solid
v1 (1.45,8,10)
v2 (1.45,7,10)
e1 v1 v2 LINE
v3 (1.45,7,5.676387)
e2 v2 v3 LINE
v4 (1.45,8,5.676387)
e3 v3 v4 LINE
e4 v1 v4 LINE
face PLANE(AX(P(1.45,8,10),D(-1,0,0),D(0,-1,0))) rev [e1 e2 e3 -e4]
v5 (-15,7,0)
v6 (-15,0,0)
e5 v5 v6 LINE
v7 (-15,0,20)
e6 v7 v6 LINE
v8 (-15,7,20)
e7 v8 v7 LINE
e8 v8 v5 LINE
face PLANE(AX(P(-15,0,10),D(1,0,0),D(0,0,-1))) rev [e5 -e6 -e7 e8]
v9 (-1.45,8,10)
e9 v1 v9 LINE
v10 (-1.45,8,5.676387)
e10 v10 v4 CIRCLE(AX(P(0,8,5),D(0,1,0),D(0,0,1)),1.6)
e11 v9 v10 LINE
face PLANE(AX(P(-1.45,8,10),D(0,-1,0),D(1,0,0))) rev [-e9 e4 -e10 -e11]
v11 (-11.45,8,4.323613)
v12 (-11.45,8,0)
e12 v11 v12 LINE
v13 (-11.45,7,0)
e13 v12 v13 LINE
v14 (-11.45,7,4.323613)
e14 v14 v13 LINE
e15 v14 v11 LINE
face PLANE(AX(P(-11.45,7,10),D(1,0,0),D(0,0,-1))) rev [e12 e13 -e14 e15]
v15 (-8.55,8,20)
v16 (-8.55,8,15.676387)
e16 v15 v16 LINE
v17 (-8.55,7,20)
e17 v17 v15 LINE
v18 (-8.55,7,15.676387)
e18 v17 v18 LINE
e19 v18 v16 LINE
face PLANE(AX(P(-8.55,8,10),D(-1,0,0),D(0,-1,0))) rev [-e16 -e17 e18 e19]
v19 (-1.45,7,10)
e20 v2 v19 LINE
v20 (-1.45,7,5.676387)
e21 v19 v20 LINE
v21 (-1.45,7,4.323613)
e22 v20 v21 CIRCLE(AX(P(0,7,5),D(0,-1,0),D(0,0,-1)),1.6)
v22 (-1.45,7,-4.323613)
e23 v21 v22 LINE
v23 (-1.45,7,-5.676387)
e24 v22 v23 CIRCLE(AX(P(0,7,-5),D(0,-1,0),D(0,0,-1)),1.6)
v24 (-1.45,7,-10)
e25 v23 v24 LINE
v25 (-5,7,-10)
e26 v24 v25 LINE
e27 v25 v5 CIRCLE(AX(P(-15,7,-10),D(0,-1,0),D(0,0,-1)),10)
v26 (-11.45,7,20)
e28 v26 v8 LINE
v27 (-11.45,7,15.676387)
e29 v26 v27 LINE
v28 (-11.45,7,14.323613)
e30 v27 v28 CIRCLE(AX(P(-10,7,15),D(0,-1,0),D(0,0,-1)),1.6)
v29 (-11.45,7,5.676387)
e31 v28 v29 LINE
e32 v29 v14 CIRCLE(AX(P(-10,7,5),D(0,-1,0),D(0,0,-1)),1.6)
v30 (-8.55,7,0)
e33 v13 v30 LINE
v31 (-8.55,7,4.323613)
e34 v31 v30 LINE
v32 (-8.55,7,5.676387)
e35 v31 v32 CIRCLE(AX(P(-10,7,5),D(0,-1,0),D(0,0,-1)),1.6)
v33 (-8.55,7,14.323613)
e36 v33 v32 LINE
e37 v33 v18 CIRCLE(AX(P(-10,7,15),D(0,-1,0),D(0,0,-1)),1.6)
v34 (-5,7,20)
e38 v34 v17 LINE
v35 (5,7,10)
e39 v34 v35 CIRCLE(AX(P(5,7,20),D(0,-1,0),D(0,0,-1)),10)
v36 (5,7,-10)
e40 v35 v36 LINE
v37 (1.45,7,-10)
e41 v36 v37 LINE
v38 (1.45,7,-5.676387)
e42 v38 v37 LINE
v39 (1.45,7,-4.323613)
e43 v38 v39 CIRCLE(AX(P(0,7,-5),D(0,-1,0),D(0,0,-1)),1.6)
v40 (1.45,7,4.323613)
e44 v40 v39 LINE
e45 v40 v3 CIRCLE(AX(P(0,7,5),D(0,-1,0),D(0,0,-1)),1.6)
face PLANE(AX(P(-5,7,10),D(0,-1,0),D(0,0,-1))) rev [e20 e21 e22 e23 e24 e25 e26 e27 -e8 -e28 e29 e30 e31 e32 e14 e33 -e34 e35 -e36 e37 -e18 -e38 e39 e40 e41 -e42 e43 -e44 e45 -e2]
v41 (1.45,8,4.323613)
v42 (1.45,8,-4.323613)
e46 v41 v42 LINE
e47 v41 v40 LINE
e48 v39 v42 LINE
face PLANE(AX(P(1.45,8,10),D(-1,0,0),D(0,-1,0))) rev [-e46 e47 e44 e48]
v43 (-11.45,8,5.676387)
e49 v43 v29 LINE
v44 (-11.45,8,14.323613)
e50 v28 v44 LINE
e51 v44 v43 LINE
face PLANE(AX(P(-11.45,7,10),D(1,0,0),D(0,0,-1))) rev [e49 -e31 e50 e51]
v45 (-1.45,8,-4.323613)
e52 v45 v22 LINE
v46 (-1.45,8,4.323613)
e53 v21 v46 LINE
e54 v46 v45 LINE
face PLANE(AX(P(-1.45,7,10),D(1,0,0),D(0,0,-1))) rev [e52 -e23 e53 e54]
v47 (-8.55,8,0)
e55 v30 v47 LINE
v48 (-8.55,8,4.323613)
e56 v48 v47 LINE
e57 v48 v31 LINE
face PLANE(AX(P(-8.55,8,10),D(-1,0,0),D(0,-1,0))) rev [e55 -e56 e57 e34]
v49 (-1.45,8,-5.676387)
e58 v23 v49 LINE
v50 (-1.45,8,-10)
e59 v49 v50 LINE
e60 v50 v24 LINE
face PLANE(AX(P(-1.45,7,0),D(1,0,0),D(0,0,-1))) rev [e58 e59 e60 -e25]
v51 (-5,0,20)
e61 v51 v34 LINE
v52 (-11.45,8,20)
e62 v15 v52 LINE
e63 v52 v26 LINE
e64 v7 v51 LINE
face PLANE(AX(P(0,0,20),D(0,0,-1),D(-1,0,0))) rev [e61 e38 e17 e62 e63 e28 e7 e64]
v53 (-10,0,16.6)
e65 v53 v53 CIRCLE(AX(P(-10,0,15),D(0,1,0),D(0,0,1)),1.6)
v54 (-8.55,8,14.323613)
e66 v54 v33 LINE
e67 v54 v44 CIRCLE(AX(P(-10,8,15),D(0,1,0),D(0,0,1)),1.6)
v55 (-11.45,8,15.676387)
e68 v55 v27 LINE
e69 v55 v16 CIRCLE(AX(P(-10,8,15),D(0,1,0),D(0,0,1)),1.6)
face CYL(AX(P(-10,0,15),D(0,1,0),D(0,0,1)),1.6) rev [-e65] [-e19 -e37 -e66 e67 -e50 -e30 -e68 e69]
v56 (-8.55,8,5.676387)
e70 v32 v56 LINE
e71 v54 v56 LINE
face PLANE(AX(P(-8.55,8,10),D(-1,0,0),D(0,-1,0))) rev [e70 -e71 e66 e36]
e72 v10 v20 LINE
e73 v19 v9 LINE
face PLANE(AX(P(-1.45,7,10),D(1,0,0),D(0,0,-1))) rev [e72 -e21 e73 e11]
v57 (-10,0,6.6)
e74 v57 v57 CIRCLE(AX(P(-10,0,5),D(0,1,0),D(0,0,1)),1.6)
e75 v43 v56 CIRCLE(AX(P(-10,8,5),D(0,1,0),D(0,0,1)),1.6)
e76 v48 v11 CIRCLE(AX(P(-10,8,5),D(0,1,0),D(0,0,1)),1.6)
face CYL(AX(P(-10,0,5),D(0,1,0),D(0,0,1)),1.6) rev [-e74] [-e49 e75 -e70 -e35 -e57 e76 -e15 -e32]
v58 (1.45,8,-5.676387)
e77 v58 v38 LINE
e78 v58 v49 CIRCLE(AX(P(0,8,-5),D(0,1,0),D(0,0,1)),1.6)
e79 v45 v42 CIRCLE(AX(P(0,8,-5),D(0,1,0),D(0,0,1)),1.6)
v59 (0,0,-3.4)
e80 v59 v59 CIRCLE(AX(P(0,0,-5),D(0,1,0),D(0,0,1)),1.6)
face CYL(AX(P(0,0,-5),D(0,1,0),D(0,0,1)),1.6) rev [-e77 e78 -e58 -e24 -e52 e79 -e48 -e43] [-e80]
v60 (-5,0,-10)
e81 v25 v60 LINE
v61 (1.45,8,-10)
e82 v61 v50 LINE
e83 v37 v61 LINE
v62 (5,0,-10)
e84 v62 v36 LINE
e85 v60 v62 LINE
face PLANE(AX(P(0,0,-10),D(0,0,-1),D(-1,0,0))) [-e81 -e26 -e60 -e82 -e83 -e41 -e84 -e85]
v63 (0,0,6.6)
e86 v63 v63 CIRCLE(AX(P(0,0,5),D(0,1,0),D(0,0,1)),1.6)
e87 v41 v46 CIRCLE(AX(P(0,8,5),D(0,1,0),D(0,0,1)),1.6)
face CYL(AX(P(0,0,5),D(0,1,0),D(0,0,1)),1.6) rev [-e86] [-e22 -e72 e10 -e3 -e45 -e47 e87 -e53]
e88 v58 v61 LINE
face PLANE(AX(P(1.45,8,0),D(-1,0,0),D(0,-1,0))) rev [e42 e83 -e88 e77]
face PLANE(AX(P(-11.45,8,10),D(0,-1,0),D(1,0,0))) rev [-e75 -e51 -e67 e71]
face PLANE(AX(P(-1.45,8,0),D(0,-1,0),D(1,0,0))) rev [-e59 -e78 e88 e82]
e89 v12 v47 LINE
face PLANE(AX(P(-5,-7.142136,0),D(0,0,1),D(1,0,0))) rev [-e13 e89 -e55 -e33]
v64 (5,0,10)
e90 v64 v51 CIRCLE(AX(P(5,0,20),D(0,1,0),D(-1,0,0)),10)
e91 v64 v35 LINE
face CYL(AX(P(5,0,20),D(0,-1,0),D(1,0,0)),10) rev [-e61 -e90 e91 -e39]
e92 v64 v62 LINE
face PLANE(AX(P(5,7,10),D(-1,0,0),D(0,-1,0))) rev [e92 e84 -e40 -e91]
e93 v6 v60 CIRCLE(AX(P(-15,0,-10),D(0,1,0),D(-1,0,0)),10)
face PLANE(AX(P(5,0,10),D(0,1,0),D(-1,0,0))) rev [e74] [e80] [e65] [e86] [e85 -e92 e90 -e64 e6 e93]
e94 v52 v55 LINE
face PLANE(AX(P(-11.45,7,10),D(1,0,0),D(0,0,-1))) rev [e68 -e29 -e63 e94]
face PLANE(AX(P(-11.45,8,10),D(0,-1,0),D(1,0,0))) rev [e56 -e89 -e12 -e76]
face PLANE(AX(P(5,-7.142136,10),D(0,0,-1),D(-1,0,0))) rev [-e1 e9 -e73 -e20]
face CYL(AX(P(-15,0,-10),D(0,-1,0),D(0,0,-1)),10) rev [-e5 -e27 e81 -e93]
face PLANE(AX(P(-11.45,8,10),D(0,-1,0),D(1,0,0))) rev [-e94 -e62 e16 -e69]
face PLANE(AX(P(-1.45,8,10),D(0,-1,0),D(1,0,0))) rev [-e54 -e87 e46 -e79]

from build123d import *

# Parameters (mm, degrees)
MAIN_DEPTH                = 10
ESQUISSE2_R               = 1.6
TOPHOLE_DEPTH             = 14.747727085
LPATTERN1_COUNT           = 2
LPATTERN1_PITCH           = 10
LPATTERN2_COUNT           = 2
LPATTERN2_PITCH           = 10
LPATTERN2_2_COUNT         = 2
LPATTERN2_2_PITCH         = 10
LPATTERN3_COUNT           = 2
LPATTERN3_PITCH           = 10
LPATTERN3_COPY_1_DEPTH    = 10
LPATTERN3_COPY_2_SKETCH_R = 1.6
LPATTERN3_COPY_2_DEPTH    = 14.747727085
LPATTERN3_COPY_3_DEPTH    = 10
SKETCH1_W                 = 10
SKETCH1_H                 = 10
CUT_EXTRUDE1_DEPTH        = 27.248809497
FILLET1_R                 = 10
SKETCH2_W                 = 10
SKETCH2_H                 = 10
CUT_EXTRUDE2_DEPTH        = 1


with BuildPart() as part:
    # Esquisse1 → Main (new body)
    with BuildSketch(Plane.XY):
        Polygon((-5, 0), (-5, 7), (-1.45, 7), (-1.45, 8), (1.45, 8), (1.45, 7), (5, 7), (5, 0), align=None)
    main = extrude(amount=MAIN_DEPTH)

    # Esquisse2 → TopHole (cut, through all)
    with BuildSketch(Plane(origin=(0, 8, 0), x_dir=(1, 0, 0), z_dir=(0, 1, 0))):
        with Locations(Location((0, -5, 0), (0, 0, 270))):
            Circle(ESQUISSE2_R)
    tophole = extrude(amount=-TOPHOLE_DEPTH, mode=Mode.SUBTRACT)


with BuildPart() as lpattern1_1:
    # LPattern1: pattern copy
    add(part.part.moved(Location(Vector(0, 0, -1) * (1 * LPATTERN1_PITCH))))


with BuildPart() as part_1:
    add(part.part)

    add(lpattern1_1.part)  # LPattern2 merges LPattern1_1
    # LPattern2: Main ×2
    with Locations(*[(-i * LPATTERN2_PITCH, 0, 0) for i in range(1, LPATTERN2_COUNT)]):
        add(main)

    # LPattern2 2: TopHole ×2
    with Locations(*[(-i * LPATTERN2_2_PITCH, 0, 0) for i in range(1, LPATTERN2_2_COUNT)]):
        add(tophole, mode=Mode.SUBTRACT)

    # LPattern3: TopHole ×2
    with Locations(*[(0, 0, i * LPATTERN3_PITCH) for i in range(1, LPATTERN3_COUNT)]):
        add(tophole, mode=Mode.SUBTRACT)

    # LPattern3 copy 1 sketch → LPattern3 copy 1 (add)
    with BuildSketch(Plane(origin=(-10, 0, 10), x_dir=(1, 0, 0), z_dir=(0, 0, 1))):
        Polygon((-5, 0), (-5, 7), (-1.45, 7), (-1.45, 8), (1.45, 8), (1.45, 7), (5, 7), (5, 0), align=None)
    extrude(amount=LPATTERN3_COPY_1_DEPTH)

    # LPattern3 copy 2 sketch → LPattern3 copy 2 (cut, through all)
    with BuildSketch(Plane(origin=(-10, 8, 10), x_dir=(1, 0, 0), z_dir=(0, 1, 0))):
        with Locations(Location((0, -5, 0), (0, 0, 270))):
            Circle(LPATTERN3_COPY_2_SKETCH_R)
    extrude(amount=-LPATTERN3_COPY_2_DEPTH, mode=Mode.SUBTRACT)

    # LPattern3 copy 3 sketch → LPattern3 copy 3 (add)
    with BuildSketch(Plane.XY.offset(10)):
        Polygon((-5, 0), (-5, 7), (-1.45, 7), (-1.45, 8), (1.45, 8), (1.45, 7), (5, 7), (5, 0), align=None)
    extrude(amount=LPATTERN3_COPY_3_DEPTH)

    # Sketch1 → Cut-Extrude1 (cut, through all)
    with BuildSketch(Plane(origin=(0, 8, 0), x_dir=(1, 0, 0), z_dir=(0, 1, 0))):
        with Locations((0, -15)):
            Rectangle(SKETCH1_W, SKETCH1_H)
    extrude(amount=-CUT_EXTRUDE1_DEPTH, mode=Mode.SUBTRACT)

    # Fillet1
    fillet1_edges = [part_1.edges().sort_by_distance(p)[0] for p in [
        (-5, 3.5, 0),
        (-5, 3.5, 10),
    ]]
    fillet(fillet1_edges, radius=FILLET1_R - 0.0001)  # a hair under: the kernel refuses the full size

    # Sketch2 → Cut-Extrude2 (cut)
    with BuildSketch(Plane(origin=(0, 8, 0), x_dir=(1, 0, 0), z_dir=(0, 1, 0))):
        with Locations((-10, 5)):
            Rectangle(SKETCH2_W, SKETCH2_H)
        with Locations((0, -15)):
            Rectangle(SKETCH2_W, SKETCH2_H)
    extrude(amount=-CUT_EXTRUDE2_DEPTH, mode=Mode.SUBTRACT)


solid = part_1.part
